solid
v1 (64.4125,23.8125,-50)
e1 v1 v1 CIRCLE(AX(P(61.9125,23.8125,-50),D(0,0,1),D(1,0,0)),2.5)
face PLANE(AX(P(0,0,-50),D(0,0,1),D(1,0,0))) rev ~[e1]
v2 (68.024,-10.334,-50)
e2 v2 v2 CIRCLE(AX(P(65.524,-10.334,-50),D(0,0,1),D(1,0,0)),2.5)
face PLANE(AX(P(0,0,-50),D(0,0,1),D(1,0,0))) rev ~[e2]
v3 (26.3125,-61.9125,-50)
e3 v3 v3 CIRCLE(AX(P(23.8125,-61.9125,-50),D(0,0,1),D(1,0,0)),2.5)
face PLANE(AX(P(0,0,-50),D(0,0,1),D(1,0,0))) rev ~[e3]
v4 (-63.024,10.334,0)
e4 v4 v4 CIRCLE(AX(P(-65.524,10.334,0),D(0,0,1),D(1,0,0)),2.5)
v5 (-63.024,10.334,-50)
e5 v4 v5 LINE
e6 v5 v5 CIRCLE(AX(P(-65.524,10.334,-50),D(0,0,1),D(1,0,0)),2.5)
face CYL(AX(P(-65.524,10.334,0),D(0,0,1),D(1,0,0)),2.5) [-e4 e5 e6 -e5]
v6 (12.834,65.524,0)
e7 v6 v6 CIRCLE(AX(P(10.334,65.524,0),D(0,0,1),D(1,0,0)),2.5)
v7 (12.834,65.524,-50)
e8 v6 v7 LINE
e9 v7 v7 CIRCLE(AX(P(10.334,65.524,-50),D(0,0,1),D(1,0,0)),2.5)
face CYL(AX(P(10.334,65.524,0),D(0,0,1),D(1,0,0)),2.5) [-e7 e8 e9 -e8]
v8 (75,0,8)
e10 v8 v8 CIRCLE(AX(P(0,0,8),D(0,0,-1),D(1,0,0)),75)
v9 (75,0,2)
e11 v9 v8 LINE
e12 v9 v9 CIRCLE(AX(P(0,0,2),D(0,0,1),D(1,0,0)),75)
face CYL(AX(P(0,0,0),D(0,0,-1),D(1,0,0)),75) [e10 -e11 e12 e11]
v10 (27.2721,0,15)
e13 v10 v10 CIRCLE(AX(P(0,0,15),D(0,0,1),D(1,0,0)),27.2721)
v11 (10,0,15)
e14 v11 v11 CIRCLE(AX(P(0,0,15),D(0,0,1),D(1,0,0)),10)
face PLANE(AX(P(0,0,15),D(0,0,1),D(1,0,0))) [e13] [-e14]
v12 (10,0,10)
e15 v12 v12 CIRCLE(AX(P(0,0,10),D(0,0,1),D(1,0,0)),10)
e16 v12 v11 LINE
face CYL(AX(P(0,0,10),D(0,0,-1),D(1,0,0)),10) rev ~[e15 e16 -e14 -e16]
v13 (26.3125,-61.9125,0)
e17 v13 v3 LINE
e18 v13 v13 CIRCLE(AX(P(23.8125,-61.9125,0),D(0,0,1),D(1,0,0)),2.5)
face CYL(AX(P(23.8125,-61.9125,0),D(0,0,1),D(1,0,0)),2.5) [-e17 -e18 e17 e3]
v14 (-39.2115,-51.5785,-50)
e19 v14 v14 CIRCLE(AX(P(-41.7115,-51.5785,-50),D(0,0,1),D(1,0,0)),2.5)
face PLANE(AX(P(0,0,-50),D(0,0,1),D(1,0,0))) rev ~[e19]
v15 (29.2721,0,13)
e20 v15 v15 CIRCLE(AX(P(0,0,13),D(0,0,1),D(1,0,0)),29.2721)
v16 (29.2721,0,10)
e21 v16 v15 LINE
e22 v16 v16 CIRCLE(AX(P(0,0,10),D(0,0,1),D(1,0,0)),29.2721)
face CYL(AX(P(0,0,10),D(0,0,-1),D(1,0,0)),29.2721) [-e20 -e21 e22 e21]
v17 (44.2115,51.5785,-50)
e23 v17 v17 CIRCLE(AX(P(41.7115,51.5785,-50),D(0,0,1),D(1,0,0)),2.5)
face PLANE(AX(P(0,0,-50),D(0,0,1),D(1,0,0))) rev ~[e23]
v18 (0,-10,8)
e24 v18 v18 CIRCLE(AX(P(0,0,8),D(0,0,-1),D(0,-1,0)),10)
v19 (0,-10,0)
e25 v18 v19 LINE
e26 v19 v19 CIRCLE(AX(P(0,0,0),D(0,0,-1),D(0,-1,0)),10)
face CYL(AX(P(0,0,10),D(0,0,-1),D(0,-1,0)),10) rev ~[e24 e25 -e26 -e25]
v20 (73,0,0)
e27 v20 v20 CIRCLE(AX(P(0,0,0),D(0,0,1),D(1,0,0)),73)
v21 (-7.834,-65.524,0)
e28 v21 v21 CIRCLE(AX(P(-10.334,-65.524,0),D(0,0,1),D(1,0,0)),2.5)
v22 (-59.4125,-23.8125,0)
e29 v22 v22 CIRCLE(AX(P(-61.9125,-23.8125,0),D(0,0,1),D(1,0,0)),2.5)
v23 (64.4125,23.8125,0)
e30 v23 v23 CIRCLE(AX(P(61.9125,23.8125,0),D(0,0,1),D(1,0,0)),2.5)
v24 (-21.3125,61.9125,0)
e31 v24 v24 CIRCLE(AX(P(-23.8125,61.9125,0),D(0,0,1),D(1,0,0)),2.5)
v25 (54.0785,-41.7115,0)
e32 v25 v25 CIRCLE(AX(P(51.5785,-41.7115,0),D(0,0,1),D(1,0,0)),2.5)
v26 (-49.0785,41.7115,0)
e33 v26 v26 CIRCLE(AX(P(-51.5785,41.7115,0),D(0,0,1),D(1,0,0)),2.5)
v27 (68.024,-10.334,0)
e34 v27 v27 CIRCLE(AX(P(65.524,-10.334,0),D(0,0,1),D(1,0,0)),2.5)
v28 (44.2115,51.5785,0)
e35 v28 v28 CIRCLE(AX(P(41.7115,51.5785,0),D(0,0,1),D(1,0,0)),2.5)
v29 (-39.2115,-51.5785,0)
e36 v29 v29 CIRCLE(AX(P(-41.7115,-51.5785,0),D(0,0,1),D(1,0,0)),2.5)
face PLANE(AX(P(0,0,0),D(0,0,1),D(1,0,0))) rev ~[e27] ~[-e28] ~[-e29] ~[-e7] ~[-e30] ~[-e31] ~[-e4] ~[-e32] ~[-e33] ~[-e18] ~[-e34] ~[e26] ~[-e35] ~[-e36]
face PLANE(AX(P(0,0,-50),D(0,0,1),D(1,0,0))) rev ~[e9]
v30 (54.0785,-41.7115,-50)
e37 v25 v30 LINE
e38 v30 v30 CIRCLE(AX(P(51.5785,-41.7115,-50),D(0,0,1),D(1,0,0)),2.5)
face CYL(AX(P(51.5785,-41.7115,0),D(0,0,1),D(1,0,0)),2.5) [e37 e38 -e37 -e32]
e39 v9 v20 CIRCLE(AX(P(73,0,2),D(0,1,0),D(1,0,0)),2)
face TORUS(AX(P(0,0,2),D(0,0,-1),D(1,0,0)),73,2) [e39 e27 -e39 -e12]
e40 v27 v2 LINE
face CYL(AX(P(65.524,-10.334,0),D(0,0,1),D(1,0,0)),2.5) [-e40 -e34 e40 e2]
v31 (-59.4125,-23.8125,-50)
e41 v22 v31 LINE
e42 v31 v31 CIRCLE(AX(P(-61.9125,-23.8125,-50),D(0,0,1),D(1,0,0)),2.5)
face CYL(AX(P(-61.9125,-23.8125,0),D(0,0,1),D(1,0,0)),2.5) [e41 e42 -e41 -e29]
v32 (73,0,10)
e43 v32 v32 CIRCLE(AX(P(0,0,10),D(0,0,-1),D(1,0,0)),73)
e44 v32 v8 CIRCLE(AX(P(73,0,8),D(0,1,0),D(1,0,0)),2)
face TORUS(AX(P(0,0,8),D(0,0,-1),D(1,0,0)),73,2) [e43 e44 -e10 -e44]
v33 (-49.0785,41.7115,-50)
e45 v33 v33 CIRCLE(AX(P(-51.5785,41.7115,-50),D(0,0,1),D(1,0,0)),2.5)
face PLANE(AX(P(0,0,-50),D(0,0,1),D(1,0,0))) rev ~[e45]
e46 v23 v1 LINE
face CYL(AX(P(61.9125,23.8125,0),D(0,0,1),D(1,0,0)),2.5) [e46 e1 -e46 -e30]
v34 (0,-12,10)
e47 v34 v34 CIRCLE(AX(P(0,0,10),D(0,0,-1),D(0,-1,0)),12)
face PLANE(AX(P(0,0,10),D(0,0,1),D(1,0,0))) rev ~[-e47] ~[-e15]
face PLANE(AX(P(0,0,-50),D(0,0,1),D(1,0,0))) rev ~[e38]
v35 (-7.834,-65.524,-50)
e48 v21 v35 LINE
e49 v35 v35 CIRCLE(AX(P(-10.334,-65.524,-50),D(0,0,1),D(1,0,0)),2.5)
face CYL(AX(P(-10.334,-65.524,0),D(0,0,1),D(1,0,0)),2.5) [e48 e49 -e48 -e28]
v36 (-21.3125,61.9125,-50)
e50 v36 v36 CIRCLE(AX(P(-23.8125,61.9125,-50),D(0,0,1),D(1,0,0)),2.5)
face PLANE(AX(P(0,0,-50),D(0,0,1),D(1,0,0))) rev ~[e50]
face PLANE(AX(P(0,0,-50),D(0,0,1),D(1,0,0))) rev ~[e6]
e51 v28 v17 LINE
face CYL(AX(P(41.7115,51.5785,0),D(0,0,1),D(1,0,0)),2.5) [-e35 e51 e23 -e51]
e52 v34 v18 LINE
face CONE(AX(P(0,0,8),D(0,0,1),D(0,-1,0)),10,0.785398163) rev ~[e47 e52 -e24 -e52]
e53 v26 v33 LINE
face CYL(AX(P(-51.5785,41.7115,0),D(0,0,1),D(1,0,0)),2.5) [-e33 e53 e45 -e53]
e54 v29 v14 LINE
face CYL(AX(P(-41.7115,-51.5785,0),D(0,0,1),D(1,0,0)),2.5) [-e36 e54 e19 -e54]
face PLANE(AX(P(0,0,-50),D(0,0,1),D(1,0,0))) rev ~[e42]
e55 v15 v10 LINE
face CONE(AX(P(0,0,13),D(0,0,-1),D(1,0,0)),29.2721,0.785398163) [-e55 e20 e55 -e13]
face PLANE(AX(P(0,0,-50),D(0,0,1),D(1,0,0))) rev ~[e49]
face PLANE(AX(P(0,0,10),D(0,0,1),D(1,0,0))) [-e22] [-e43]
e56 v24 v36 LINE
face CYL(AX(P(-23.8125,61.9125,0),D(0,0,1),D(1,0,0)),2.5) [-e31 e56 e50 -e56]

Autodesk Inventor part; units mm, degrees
ref_plane "YZ Plane" through (0, 0, 0) normal (1, 0, 0) x (0, 1, 0)
ref_plane "XZ Plane" through (0, 0, 0) normal (0, 1, 0) x (-1, 0, 0)
ref_plane "XY Plane" through (0, 0, 0) normal (0, 0, 1) x (1, 0, 0)
sketch "Sketch1" plane through (0, 0, 0) normal (0, 0, 1) x (1, 0, 0)
  point P0 (0, 0)
sketch "Sketch2" plane through (0, 0, 0) normal (0, 0, 1) x (1, 0, 0)
  circle A0 centre (0, 0) radius 75
  line L0 (-65.0875, -9.525) -> (-104.775, -39.6875) construction
  line L1 (-104.775, -39.6875) -> (-119.0625, -20.6375) construction
  line L2 (-119.0625, -20.6375) -> (-158.75, -15.875) construction
  line L3 (-158.75, -15.875) -> (-179.3875, -52.3875) construction
  spline S0 degree 4 poles (-65.0875, -9.525) (-104.775, -39.6875) (-119.0625, -20.6375) (-158.75, -15.875) (-179.3875, -52.3875) knots 1 1 1 1 1 2 2 2 2 2
  circle A1 centre (-65.0875, -9.525) radius 2.5
  dimension "d0" = 150
  dimension "d87" = 5
extrude "Extrusion1" add sketch "Sketch2" along normal blind 10 contours A0 | A1
hole "Hole1" at (0, 0, 0) direction (0, 0, 1) diameter 5 end through all
sketch "Sketch3" plane through (0, 0, 10) normal (0, 0, 1) x (1, 0, 0)
  point P0 (0, 0)
sketch "Sketch4" plane through (0, 0, 10) normal (0, 0, 1) x (1, 0, 0)
  point P0 (0, 0)
hole "Hole2" at (0, 0, 10) direction (0, 0, -1) diameter 20 end through all
chamfer "Chamfer1" distance 2 angle 45 1 edges at (0, 10, 10)
fillet "Fillet1" radius 2 1 edges at (-75, 0, 10)
fillet "Fillet2" radius 2 1 edges at (-75, 0, 0)
sketch "Sketch8" plane through (0, 0, 10) normal (0, 0, 1) x (1, 0, 0)
  circle A0 centre (0, 0) radius 10 projected
  circle A1 centre (0, 0) radius 29.2721
extrude "Extrusion4" add sketch "Sketch8" along normal blind 5
chamfer "Chamfer2" distance 2 angle 45 1 edges at (-29.2721, 0, 15)
sketch "Sketch24" plane through (0, 0, 0) normal (1, 0, 0) x (0, 1, 0)
  line L0 (10, 0) -> (-10, 0) projected
  point P0 (0, 0)
sketch "Sketch25" plane through (0, 0, 0) normal (0, 0, 1) x (1, 0, 0)
  circle A0 centre (0, 0) radius 10 projected
  circle A1 centre (0, 0) radius 73 projected
  circle A2 centre (23.8125, -61.9125) radius 2.5
  circle A3 centre (51.5785, -41.7115) radius 2.5
  circle A4 centre (65.524, -10.334) radius 2.5
  circle A5 centre (61.9125, 23.8125) radius 2.5
  circle A6 centre (41.7115, 51.5785) radius 2.5
  circle A7 centre (10.334, 65.524) radius 2.5
  circle A8 centre (-23.8125, 61.9125) radius 2.5
  circle A9 centre (-51.5785, 41.7115) radius 2.5
  circle A10 centre (-65.524, 10.334) radius 2.5
  circle A11 centre (-61.9125, -23.8125) radius 2.5
  circle A12 centre (-41.7115, -51.5785) radius 2.5
  circle A13 centre (-10.334, -65.524) radius 2.5
  circle A14 centre (0, 0) radius 10 projected
  circle A15 centre (0, 0) radius 10 projected
  dimension "d104" = 5
  dimension "d107" = 360
sketch "Sketch26" plane through (0, 0, 0) normal (0, 0, -1) x (-1, 0, 0)
  point P0 (0, 0)
extrude "Extrusion6" add sketch "Sketch25" against normal blind 50 contours A3 | A4 | A5 | A6 | A7 | A8 | A9 | A10 | A11 | A12 | A13
sketch "Sketch28" plane through (0, 0, 0) normal (0, 0, -1) x (-1, 0, 0)
  circle A0 centre (-51.5785, -41.7115) radius 2.5 projected
  circle A1 centre (65.524, 10.334) radius 2.5 projected
  circle A2 centre (-51.5785, -41.7115) radius 2.5 projected
  circle A3 centre (-10.334, 65.524) radius 2.5 projected
  circle A4 centre (-65.524, -10.334) radius 2.5 projected
  circle A5 centre (61.9125, -23.8125) radius 2.5 projected
  circle A6 centre (51.5785, 41.7115) radius 2.5 projected
  circle A7 centre (10.334, -65.524) radius 2.5 projected
  circle A8 centre (-41.7115, 51.5785) radius 2.5 projected
  circle A9 centre (-61.9125, 23.8125) radius 2.5 projected
  circle A10 centre (41.7115, -51.5785) radius 2.5 projected
  circle A11 centre (23.8125, 61.9125) radius 2.5 projected
  circle A12 centre (0, 0) radius 10 projected
  circle A13 centre (0, 0) radius 73 projected
  circle A14 centre (65.524, 10.334) radius 2.5 projected
  circle A15 centre (-51.5785, -41.7115) radius 2.5 projected
  circle A16 centre (-10.334, 65.524) radius 2.5 projected
  circle A17 centre (-65.524, -10.334) radius 2.5 projected
  circle A18 centre (61.9125, -23.8125) radius 2.5 projected
  circle A19 centre (51.5785, 41.7115) radius 2.5 projected
  circle A20 centre (10.334, -65.524) radius 2.5 projected
  circle A21 centre (-41.7115, 51.5785) radius 2.5 projected
  circle A22 centre (-61.9125, 23.8125) radius 2.5 projected
  circle A23 centre (41.7115, -51.5785) radius 2.5 projected
  circle A24 centre (23.8125, 61.9125) radius 2.5 projected
  circle A25 centre (0, 0) radius 10 projected
  circle A26 centre (0, 0) radius 73 projected
  circle A27 centre (65.524, 10.334) radius 2.5 projected
  circle A28 centre (-51.5785, -41.7115) radius 2.5 projected
  circle A29 centre (-10.334, 65.524) radius 2.5 projected
  circle A30 centre (-65.524, -10.334) radius 2.5 projected
  circle A31 centre (61.9125, -23.8125) radius 2.5 projected
  circle A32 centre (51.5785, 41.7115) radius 2.5 projected
  circle A33 centre (10.334, -65.524) radius 2.5 projected
  circle A34 centre (-41.7115, 51.5785) radius 2.5 projected
  circle A35 centre (-61.9125, 23.8125) radius 2.5 projected
  circle A36 centre (41.7115, -51.5785) radius 2.5 projected
  circle A37 centre (23.8125, 61.9125) radius 2.5 projected
  circle A38 centre (0, 0) radius 10 projected
  circle A39 centre (0, 0) radius 73 projected
sketch "Sketch29" plane through (0, 0, 0) normal (0, 0, 1) x (1, 0, 0)
  circle A0 centre (23.8125, -61.9125) radius 2.5
  point P0 (0, 0)
  dimension "d111" = 5
extrude "Extrusion7" add sketch "Sketch29" against normal blind 50
properties part number "base"
